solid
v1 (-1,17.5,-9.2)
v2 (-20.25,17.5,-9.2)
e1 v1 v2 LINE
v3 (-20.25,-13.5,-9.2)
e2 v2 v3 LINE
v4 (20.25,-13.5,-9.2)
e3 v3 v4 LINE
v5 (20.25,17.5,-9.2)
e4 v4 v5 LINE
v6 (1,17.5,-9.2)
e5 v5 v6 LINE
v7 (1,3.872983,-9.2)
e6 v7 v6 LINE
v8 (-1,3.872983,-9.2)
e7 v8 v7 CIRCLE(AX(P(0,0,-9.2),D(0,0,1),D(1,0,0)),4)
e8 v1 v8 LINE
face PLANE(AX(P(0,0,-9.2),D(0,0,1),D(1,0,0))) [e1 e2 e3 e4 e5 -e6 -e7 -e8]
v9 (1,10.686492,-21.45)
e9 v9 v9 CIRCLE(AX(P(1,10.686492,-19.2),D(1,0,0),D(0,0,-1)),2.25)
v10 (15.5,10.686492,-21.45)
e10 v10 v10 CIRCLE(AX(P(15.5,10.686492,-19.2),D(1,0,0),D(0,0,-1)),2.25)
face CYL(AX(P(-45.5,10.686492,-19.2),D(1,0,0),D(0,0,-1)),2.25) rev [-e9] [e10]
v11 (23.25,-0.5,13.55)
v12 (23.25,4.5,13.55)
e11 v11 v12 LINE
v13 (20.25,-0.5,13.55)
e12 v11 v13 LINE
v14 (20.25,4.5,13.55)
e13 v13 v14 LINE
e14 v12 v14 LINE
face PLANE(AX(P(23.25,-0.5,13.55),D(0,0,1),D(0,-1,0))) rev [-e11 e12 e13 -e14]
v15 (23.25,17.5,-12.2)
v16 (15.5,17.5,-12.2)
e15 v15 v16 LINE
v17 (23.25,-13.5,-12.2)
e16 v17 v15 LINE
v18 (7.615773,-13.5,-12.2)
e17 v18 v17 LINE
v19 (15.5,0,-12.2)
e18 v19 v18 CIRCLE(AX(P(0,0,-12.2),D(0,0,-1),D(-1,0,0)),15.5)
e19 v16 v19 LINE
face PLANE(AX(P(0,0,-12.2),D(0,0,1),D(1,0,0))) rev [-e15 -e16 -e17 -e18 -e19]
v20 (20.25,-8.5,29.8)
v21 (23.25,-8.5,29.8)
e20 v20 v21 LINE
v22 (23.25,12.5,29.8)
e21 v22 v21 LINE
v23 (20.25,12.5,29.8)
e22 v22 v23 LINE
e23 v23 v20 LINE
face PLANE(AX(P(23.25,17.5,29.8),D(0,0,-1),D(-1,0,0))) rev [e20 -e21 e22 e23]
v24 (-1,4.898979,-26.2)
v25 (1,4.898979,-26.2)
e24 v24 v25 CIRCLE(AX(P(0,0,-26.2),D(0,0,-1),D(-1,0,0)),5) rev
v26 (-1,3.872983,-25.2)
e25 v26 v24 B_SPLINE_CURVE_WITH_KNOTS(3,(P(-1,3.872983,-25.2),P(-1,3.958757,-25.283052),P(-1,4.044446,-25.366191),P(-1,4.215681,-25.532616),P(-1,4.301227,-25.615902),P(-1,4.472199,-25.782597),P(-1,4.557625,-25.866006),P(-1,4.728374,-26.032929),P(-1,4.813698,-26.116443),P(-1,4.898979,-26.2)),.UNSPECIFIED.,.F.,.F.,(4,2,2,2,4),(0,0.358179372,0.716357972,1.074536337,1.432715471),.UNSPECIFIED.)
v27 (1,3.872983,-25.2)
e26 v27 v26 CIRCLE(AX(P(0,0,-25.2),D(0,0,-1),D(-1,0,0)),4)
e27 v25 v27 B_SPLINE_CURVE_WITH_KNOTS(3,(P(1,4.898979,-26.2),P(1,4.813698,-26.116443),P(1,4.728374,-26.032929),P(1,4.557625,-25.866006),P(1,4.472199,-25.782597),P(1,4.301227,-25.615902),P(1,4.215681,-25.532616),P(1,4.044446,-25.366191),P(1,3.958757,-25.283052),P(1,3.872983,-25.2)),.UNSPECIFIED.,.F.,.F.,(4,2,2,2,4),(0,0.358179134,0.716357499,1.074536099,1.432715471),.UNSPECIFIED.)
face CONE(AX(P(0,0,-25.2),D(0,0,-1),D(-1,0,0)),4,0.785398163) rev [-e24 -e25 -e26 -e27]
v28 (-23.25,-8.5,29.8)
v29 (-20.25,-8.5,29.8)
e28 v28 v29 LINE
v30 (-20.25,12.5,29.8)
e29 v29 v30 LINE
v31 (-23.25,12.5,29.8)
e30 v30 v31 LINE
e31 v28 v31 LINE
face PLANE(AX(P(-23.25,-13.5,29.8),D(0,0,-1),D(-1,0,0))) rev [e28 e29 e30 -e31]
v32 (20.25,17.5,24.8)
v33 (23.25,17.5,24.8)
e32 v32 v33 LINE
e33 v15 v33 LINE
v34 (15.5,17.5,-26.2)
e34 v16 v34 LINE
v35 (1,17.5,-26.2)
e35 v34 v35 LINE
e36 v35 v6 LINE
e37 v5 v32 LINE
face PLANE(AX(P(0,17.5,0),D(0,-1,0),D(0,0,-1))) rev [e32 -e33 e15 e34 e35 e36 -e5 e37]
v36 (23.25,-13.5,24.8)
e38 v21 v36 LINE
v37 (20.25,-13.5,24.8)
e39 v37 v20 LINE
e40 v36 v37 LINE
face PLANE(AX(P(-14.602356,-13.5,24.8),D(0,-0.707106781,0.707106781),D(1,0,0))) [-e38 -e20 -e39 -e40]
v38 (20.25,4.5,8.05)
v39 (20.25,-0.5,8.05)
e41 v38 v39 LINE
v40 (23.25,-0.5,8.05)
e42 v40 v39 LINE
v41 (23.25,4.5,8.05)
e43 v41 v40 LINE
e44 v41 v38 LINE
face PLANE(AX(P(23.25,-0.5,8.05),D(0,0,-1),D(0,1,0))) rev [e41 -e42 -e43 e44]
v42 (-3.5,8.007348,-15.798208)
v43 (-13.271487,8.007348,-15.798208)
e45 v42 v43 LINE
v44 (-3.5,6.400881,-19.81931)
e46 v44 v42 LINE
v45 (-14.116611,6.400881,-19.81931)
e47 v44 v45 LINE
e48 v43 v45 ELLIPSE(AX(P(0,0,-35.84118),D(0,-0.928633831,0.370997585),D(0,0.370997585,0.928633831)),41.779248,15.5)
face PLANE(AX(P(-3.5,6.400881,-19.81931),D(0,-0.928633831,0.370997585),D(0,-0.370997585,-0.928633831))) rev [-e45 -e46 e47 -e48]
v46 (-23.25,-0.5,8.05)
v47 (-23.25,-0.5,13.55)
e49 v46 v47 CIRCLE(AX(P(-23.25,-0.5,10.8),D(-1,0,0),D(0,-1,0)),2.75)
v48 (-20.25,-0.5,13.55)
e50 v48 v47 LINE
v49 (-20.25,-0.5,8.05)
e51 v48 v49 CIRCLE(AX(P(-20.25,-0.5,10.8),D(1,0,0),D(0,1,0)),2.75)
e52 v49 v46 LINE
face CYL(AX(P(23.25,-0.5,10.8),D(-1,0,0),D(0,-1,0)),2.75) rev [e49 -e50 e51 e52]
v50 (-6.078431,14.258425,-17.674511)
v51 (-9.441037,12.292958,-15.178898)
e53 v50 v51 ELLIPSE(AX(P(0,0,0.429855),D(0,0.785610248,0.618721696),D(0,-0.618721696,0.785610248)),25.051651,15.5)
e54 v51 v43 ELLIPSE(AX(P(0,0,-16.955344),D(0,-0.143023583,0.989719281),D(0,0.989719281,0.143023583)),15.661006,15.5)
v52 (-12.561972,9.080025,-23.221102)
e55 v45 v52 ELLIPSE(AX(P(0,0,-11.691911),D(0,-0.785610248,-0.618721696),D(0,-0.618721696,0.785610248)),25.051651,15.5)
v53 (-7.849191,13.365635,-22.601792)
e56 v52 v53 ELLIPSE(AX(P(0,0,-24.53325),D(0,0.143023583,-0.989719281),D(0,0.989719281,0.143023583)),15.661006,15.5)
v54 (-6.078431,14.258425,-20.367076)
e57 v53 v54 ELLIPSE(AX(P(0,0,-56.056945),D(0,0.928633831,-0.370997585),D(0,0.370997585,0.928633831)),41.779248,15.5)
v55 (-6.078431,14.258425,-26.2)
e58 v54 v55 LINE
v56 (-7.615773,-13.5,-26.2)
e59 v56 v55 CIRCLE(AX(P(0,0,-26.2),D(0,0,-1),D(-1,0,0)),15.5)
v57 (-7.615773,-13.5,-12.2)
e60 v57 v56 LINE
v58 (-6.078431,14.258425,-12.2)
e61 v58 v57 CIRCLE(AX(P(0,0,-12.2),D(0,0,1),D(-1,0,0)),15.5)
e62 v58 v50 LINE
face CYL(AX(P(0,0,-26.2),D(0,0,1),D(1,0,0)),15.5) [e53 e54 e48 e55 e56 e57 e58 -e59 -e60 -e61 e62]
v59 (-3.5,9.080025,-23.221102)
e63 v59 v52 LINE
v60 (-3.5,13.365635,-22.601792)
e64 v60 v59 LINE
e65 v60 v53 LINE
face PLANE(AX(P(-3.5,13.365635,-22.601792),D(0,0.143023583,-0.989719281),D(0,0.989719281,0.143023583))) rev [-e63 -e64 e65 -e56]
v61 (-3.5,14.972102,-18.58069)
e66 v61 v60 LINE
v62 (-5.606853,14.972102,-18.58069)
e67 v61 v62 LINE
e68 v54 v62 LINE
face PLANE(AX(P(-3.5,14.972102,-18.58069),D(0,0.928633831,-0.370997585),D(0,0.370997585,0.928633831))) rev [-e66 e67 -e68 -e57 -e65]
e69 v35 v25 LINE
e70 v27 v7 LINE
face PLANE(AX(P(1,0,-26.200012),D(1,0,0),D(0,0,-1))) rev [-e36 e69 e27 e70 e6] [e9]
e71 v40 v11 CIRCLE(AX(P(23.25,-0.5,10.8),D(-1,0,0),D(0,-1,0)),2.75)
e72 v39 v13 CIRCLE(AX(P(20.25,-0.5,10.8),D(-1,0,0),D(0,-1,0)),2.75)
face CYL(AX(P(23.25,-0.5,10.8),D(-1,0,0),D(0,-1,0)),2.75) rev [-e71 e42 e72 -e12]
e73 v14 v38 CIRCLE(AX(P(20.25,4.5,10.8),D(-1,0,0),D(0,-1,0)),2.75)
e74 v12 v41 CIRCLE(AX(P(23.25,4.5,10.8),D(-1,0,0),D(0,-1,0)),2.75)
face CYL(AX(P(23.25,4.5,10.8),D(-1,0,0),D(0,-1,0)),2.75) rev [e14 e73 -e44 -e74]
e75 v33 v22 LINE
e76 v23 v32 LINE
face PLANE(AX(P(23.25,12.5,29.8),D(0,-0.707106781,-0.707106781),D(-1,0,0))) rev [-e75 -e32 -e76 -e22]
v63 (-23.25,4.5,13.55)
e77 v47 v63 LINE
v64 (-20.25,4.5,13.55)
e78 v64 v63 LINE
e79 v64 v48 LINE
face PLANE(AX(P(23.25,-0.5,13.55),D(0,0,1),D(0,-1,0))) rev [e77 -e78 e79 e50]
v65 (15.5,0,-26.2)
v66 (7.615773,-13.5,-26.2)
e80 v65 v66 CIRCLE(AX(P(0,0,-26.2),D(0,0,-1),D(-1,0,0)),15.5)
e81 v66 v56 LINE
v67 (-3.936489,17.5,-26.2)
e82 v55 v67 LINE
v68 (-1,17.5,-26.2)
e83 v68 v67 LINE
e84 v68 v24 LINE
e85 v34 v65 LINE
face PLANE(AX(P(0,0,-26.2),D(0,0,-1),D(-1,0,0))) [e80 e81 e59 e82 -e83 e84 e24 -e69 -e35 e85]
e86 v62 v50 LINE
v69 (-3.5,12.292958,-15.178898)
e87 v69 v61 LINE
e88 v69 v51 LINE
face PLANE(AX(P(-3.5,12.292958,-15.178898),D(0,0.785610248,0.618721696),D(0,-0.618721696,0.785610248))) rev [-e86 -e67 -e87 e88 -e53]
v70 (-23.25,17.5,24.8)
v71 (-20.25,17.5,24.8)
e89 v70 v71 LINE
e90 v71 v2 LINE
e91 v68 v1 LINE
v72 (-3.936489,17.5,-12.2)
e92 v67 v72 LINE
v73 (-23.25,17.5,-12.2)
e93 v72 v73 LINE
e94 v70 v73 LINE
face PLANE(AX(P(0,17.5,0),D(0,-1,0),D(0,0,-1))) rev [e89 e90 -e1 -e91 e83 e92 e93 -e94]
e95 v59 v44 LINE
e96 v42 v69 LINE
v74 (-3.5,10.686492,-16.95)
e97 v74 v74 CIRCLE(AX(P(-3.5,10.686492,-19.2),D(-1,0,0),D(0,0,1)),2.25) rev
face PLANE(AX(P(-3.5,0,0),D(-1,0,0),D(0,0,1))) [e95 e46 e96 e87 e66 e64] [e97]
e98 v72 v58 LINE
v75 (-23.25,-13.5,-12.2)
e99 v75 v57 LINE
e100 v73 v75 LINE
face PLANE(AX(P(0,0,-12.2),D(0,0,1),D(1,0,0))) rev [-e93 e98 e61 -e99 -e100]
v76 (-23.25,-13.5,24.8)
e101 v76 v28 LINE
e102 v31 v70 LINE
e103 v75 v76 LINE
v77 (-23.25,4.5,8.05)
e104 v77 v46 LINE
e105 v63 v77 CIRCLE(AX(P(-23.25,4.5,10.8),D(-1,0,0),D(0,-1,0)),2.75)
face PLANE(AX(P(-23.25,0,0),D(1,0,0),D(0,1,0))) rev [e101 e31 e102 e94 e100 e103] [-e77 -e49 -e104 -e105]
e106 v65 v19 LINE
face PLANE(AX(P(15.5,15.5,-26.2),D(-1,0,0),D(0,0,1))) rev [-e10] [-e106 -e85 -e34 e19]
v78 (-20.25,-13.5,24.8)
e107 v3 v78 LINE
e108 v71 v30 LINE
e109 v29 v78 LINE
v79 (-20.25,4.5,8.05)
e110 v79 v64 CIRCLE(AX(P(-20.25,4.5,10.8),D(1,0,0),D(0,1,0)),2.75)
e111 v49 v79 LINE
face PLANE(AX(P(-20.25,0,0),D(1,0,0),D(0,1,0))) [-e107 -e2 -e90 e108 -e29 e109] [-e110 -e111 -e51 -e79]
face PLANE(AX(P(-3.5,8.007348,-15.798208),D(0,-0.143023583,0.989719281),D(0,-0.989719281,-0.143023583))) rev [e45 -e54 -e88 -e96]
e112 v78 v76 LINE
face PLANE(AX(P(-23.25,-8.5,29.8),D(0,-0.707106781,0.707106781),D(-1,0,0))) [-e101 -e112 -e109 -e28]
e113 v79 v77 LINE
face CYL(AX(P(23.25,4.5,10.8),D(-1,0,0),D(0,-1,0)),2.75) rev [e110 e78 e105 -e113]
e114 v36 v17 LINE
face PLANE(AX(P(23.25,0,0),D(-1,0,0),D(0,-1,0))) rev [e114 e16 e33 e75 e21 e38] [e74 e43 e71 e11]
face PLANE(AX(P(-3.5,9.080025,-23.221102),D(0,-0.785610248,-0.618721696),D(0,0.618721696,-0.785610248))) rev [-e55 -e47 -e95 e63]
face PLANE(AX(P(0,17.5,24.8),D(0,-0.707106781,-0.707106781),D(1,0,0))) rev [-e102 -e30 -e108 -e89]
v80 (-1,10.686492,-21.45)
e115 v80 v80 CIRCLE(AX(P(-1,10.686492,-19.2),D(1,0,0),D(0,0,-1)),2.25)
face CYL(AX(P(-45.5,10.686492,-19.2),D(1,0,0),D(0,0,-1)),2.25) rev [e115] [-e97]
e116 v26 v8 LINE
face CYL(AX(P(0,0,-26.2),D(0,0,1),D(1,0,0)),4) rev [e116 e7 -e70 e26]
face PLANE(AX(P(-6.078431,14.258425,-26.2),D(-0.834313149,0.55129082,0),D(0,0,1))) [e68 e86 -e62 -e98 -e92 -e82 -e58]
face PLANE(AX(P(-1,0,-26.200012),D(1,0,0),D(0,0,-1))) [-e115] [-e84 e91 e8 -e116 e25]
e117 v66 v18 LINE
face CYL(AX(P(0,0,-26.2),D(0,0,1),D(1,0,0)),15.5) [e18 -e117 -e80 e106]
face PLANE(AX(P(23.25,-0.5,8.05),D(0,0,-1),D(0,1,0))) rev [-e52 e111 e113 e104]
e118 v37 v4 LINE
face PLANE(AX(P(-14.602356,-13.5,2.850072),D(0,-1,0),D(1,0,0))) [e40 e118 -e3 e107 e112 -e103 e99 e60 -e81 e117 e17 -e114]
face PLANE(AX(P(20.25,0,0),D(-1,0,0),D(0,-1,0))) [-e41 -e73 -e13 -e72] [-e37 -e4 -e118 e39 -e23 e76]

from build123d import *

# Parameters (mm, degrees)
SKETCH1_R                    = 4
SKETCH1_R_2                  = 2.249999999999999
BOSS_EXTRUDE1_DEPTH          = 24
SKETCH2_R                    = 2.2499999999999956
SKETCH2_R_2                  = 4
BOSS_EXTRUDE2_DEPTH          = 24
CUT_EXTRUDE1_DEPTH           = 14
CUT_EXTRUDE2_START           = -14
CUT_EXTRUDE2_DEPTH           = 14
BOSS_EXTRUDE3_DEPTH          = 2
CUT_EXTRUDE_THIN1_DEPTH      = 70.97528134991671
CUT_EXTRUDE_THIN1_DEPTH_BACK = 53.00000000000001
SKETCH6_W                    = 2
SKETCH6_H                    = 35.40537681916631
SKETCH7_R                    = 2.249999999999999
CUT_EXTRUDE3_DEPTH           = 55.524673314014464
CUT_EXTRUDE4_DEPTH           = 41.99999999999999
CHAMFER2_SIZE                = 1
SKETCH9_R                    = 45.63024731549585
CUT_EXTRUDE5_DEPTH           = 2
SKETCH10_R                   = 89.28313808685371
CUT_EXTRUDE6_DEPTH           = 57.00000000000001
BOSS_EXTRUDE5_START          = 3
SKETCH11_R                   = 3.9999999999999925
BOSS_EXTRUDE5_DEPTH          = 3
BOSS_EXTRUDE6_DEPTH          = 3
BOSS_EXTRUDE7_DEPTH          = 3
CUT_EXTRUDE7_DEPTH           = 56.55663776723714
CUT_EXTRUDE7_DEPTH_BACK      = 56.55663776723714
CUT_EXTRUDE8_START           = -18.000000000000004
CUT_EXTRUDE8_DEPTH           = 18.000000000000004
CHAMFER4_SIZE                = 5


with BuildPart() as part:
    # Sketch1 → Boss-Extrude1 (new body)
    with BuildSketch(Plane.XY):
        with BuildLine():
            Line((0, 15.5), (-30, 15.5))
            Line((-30, 15.5), (-45.50000000000001, 15.499999999999995))
            Line((-45.50000000000001, 15.499999999999995), (-45.5, 1.9e-15))
            ThreePointArc((-45.5, 1.9e-15), (-40.96015510839149, -10.960155108391486), (-30, -15.499999999999996))
            Line((-30, -15.499999999999996), (0, -15.5))
            ThreePointArc((0, -15.5), (10.960155108391488, -10.960155108391486), (15.5, 0))
            Line((15.5, 0), (15.5, 15.5))
            Line((15.5, 15.5), (0, 15.5))
        make_face()
        Circle(SKETCH1_R, mode=Mode.SUBTRACT)
        with Locations((-30, 0)):
            Circle(SKETCH1_R_2, mode=Mode.SUBTRACT)
    extrude(amount=BOSS_EXTRUDE1_DEPTH)

    # Sketch4 → Cut-Extrude2 (cut)
    with BuildSketch(Plane.XY.offset(24).offset(CUT_EXTRUDE2_START)):
        with BuildLine():
            Line((-1.32e-15, 15.499999999999998), (-45.50000000000001, 15.499999999999995))
            Line((-45.50000000000001, 15.499999999999995), (-45.5, 1.9e-15))
            ThreePointArc((-45.5, 1.9e-15), (-40.96015510839149, -10.960155108391486), (-30.000000000000004, -15.5))
            Line((-30.000000000000004, -15.5), (0, -15.5))
            ThreePointArc((0, -15.5), (-15.499999999999998, 1.9e-15), (-1.32e-15, 15.499999999999998))
        make_face()
    extrude(amount=CUT_EXTRUDE2_DEPTH, mode=Mode.SUBTRACT)



with BuildPart() as body_2:
    # Sketch2 → Boss-Extrude2 (new body)
    with BuildSketch(Plane(origin=(0, 0, -2.2), x_dir=(-1, 0, 0), z_dir=(0, 0, -1))):
        with BuildLine():
            Line((-2.85e-15, -15.5), (30.000000000000004, -15.499999999999998))
            ThreePointArc((30.000000000000004, -15.499999999999998), (40.96015510839149, -10.960155108391485), (45.5, 0))
            Line((45.5, 0), (45.50000000000001, 15.499999999999995))
            Line((45.50000000000001, 15.499999999999995), (-15.5, 15.5))
            Line((-15.5, 15.5), (-15.5, 1.73e-15))
            ThreePointArc((-15.5, 1.73e-15), (-10.96015510839149, -10.960155108391486), (-2.85e-15, -15.5))
        make_face()
        with Locations((30, 0)):
            Circle(SKETCH2_R, mode=Mode.SUBTRACT)
        Circle(SKETCH2_R_2, mode=Mode.SUBTRACT)
    extrude(amount=BOSS_EXTRUDE2_DEPTH)

    # Sketch3 → Cut-Extrude1 (cut)
    with BuildSketch(Plane(origin=(0, 0, -26.200000000000003), x_dir=(-1, 0, 0), z_dir=(0, 0, -1))):
        with BuildLine():
            Line((-2.85e-15, -15.5), (30.000000000000004, -15.499999999999998))
            ThreePointArc((30.000000000000004, -15.499999999999998), (40.96015510839149, -10.960155108391485), (45.5, 0))
            Line((45.5, 0), (45.50000000000001, 15.499999999999995))
            Line((45.50000000000001, 15.499999999999995), (1.32e-15, 15.499999999999998))
            ThreePointArc((1.32e-15, 15.499999999999998), (15.5, -3.44e-15), (-2.85e-15, -15.5))
        make_face()
    extrude(amount=-CUT_EXTRUDE1_DEPTH, mode=Mode.SUBTRACT)


with BuildPart() as part_1:
    add(part.part)

    add(body_2.part)  # Boss-Extrude3 merges body 2
    # Sketch5 → Boss-Extrude3 (add)
    with BuildSketch(Plane(origin=(-1.32e-15, 15.499999999999998, 0), x_dir=(1, 1.1e-16, 0), z_dir=(-1.1e-16, 1, 0))):
        Polygon((-45.50000000000001, 12.200000000000001), (1.77e-15, 12.200000000000001), (0, 26.200000000000003), (15.500000000000002, 26.200000000000003), (15.500000000000002, -24), (0, -24), (1.77e-15, -10), (-45.50000000000001, -10), (-45.50000000000001, 0), (-38.50000000000001, 0), (-38.50000000000001, 2.200000000000001), (-45.50000000000001, 2.2), align=None)
    extrude(amount=BOSS_EXTRUDE3_DEPTH)

    # Chamfer1
    # the kernel refuses this chamfer: 10 mm, written as the material it adds along each edge
    with BuildSketch(Plane(origin=(-3.72e-15, 15.5, 10), x_dir=(0.026587242345483465, 0.9996464967899715, 0), z_dir=(0, 0, 1))) as chamfer1_piece_1_section:
        with BuildLine():
            Line((8.29406545002713, 1e-17), (-1.7422154358514688, 6.254838102034438))
            Line((-1.7422154358514688, 6.254838102034438), (-1.9240447967842007, 6.17154294309471))
            ThreePointArc((-1.9240447967842007, 6.17154294309471), (-0.6239231337177482, 3.187248798266774), (-0.19992929935799358, -0.00531744846909673))
            Line((-0.19992929935799358, -0.00531744846909673), (0.00531744846909669, -0.1999292993579943))
            ThreePointArc((0.00531744846909669, -0.1999292993579943), (4.149418712953845, -0.08971011189834381), (8.299382898496228, -0.19992929935799428))
            Line((8.299382898496228, -0.19992929935799428), (8.29406545002713, 1e-17))
        make_face()
    chamfer1_piece_1 = extrude(amount=14, mode=Mode.PRIVATE)
    chamfer1_piece_1 = split(chamfer1_piece_1, bisect_by=Plane(origin=(-2.6872969980278754, 17.5, 17.000000000000004), z_dir=(1.1e-16, -1, 0)), keep=Keep.TOP, mode=Mode.PRIVATE)
    add(chamfer1_piece_1)
    with BuildSketch(Plane(origin=(-1.32e-15, 15.5, -26.200000000000003), x_dir=(-0.9701220678115945, -0.24261733974503139, 0), z_dir=(0, 0, 1))) as chamfer1_piece_2_section:
        with BuildLine():
            Line((6.4929434240243395, 9e-17), (-2.2255005025199233, -7.9899104627409505))
            Line((-2.2255005025199233, -7.9899104627409505), (-2.419524916082242, -7.941386994791944))
            ThreePointArc((-2.419524916082242, -7.941386994791944), (-1.1998107866971348, -3.973182305874418), (-0.19402441356231892, 0.04852346794900628))
            Line((-0.19402441356231892, 0.04852346794900628), (0.0485234679490061, 0.1940244135623182))
            ThreePointArc((0.0485234679490061, 0.1940244135623182), (3.237781752513792, -0.25417376326036684), (6.461492077353489, 0.19751155103585727))
            Line((6.461492077353489, 0.19751155103585727), (6.4929434240243395, 9e-17))
        make_face()
    chamfer1_piece_2 = extrude(amount=14, mode=Mode.PRIVATE)
    chamfer1_piece_2 = split(chamfer1_piece_2, bisect_by=Plane(origin=(-2.687296998027888, 17.5, -19.200000000000006), z_dir=(1.1e-16, -1, 0)), keep=Keep.TOP, mode=Mode.PRIVATE)
    add(chamfer1_piece_2)

    # Sketch6 → Cut-Extrude-Thin1 (cut, two sides: drawn at the far end of the back side and taken through both)
    with BuildSketch(Plane(origin=(0, 0, -26.200000000000003), x_dir=(-1, 0, 0), z_dir=(0, 0, -1)).offset(-CUT_EXTRUDE_THIN1_DEPTH_BACK)):
        with Locations((0, 17.702688409583153)):
            Rectangle(SKETCH6_W, SKETCH6_H)
    extrude(amount=CUT_EXTRUDE_THIN1_DEPTH + CUT_EXTRUDE_THIN1_DEPTH_BACK, mode=Mode.SUBTRACT)

    # Sketch7 → Cut-Extrude3 (cut, symmetric)
    with BuildSketch(Plane(origin=(-1, 0, 0), x_dir=(0, 0, -1), z_dir=(1, 0, 0))):
        with Locations((19.200000000000006, 10.686491673103705)):
            Circle(SKETCH7_R)
    cut_extrude3 = extrude(amount=CUT_EXTRUDE3_DEPTH, both=True, mode=Mode.SUBTRACT)

    # Mirror1: Cut-Extrude3 across plane
    add(cut_extrude3.mirror(Plane(origin=(0, 0, -1.1000000000000003), x_dir=(1, 0, 0), z_dir=(0, 0, -1))), mode=Mode.SUBTRACT)

    # Sketch8 → Cut-Extrude4 (cut)
    with BuildSketch(Plane.ZY.offset(45.50000000000001)):
        Polygon((-15.1788975572378, 12.292958337809747), (-18.58068972058721, 14.97210187210845), (-22.60179216334942, 13.365635207402391), (-23.221102442762213, 9.080025008397632), (-19.8193102794128, 6.4008814740989255), (-15.798207836650597, 8.007348138804984), align=None)
        Polygon((12.978897557237794, 12.292958337809734), (13.598207836650598, 8.007348138804979), (17.61931027941281, 6.400881474098927), (21.02110244276222, 9.080025008397646), (20.401792163349413, 13.365635207402406), (16.38068972058721, 14.972101872108457), align=None)
    extrude(amount=-CUT_EXTRUDE4_DEPTH, mode=Mode.SUBTRACT)

    # Chamfer2
    chamfer2_edges = [part_1.edges().sort_by_distance(p)[0] for p in [
        (-2.449489742783177, -3.1622776601683804, 24),
        (-1.22e-15, -4, -26.2),
    ]]
    chamfer(chamfer2_edges, length=CHAMFER2_SIZE)

    # Sketch9 → Cut-Extrude5 (cut)
    with BuildSketch(Plane(origin=(-1.79e-15, -15.5, 0), x_dir=(-1, 1.2e-16, 0), z_dir=(-1.2e-16, -1, 0))):
        with Locations((14.602356379640469, -2.8500724208981865)):
            Circle(SKETCH9_R)
    extrude(amount=-CUT_EXTRUDE5_DEPTH, mode=Mode.SUBTRACT)

    # Sketch10 → Cut-Extrude6 (cut)
    with BuildSketch(Plane(origin=(0, 0, -12.200000000000001), x_dir=(-1, 0, 0), z_dir=(0, 0, -1))):
        with Locations((18.92287737663878, -1.4489467579892334)):
            Circle(SKETCH10_R)
    extrude(amount=-CUT_EXTRUDE6_DEPTH, mode=Mode.SUBTRACT)

    # Sketch11 → Boss-Extrude5 (add)
    with BuildSketch(Plane.XY.offset(-12.200000000000001).offset(BOSS_EXTRUDE5_START)):
        Polygon((-20.25, 17.499999999999996), (20.250000000000004, 17.499999999999996), (20.250000000000007, -13.499999999999998), (-20.249999999999993, -13.499999999999998), align=None)
        Circle(SKETCH11_R, mode=Mode.SUBTRACT)
    extrude(amount=-BOSS_EXTRUDE5_DEPTH)

    # Sketch13 → Boss-Extrude6 (add)
    with BuildSketch(Plane(origin=(20.250000000000007, 2.27e-15, 0), x_dir=(0, 0, -1), z_dir=(1, 1.1e-16, 0))):
        Polygon((12.200000000000001, 17.499999999999993), (-29.8, 17.499999999999993), (-29.8, -13.500000000000002), (12.200000000000005, -13.500000000000002), align=None)
    extrude(amount=BOSS_EXTRUDE6_DEPTH)

    # Sketch14 → Boss-Extrude7 (add)
    with BuildSketch(Plane.ZY.offset(20.249999999999996)):
        Polygon((-12.200000000000001, -13.499999999999993), (29.8, -13.499999999999993), (29.8, 17.499999999999996), (-12.200000000000001, 17.5), align=None)
    extrude(amount=BOSS_EXTRUDE7_DEPTH)

    # Sketch15 → Cut-Extrude7 (cut, two sides: drawn at the far end of the back side and taken through both)
    with BuildSketch(Plane.ZY.offset(-20.250000000000007).offset(-CUT_EXTRUDE7_DEPTH_BACK)):
        with BuildLine():
            Line((8.05, -0.5000000000000039), (8.05, 4.499999999999997))
            ThreePointArc((8.05, 4.499999999999997), (10.8, 7.249999999999999), (13.550000000000002, 4.499999999999997))
            Line((13.550000000000002, 4.499999999999997), (13.55, -0.5000000000000034))
            ThreePointArc((13.55, -0.5000000000000034), (10.8, -3.2500000000000036), (8.05, -0.5000000000000039))
        make_face()
    extrude(amount=CUT_EXTRUDE7_DEPTH + CUT_EXTRUDE7_DEPTH_BACK, mode=Mode.SUBTRACT)

    # Sketch16 → Cut-Extrude8 (cut)
    with BuildSketch(Plane(origin=(0, 0, -12.200000000000001), x_dir=(-1, 0, 0), z_dir=(0, 0, -1)).offset(CUT_EXTRUDE8_START)):
        with BuildLine():
            Line((-1, 17.499999999999996), (-1, 3.8729833462074166))
            ThreePointArc((-1, 3.8729833462074166), (-4.8e-16, 4), (0.9999999999999991, 3.8729833462074157))
            Line((0.9999999999999991, 3.8729833462074157), (1.0000000000000009, 17.499999999999996))
            Line((1.0000000000000009, 17.499999999999996), (-1, 17.499999999999996))
        make_face()
    extrude(amount=CUT_EXTRUDE8_DEPTH, mode=Mode.SUBTRACT)

    # Chamfer4
    chamfer4_edges = [part_1.edges().sort_by_distance(p)[0] for p in [
        (21.750000000000004, 17.499999999999996, 29.8),
        (21.750000000000007, -13.5, 29.8),
        (-21.749999999999993, -13.499999999999998, 29.8),
        (-21.75, 17.499999999999993, 29.8),
    ]]
    chamfer(chamfer4_edges, length=CHAMFER4_SIZE)


solid = part_1.part
